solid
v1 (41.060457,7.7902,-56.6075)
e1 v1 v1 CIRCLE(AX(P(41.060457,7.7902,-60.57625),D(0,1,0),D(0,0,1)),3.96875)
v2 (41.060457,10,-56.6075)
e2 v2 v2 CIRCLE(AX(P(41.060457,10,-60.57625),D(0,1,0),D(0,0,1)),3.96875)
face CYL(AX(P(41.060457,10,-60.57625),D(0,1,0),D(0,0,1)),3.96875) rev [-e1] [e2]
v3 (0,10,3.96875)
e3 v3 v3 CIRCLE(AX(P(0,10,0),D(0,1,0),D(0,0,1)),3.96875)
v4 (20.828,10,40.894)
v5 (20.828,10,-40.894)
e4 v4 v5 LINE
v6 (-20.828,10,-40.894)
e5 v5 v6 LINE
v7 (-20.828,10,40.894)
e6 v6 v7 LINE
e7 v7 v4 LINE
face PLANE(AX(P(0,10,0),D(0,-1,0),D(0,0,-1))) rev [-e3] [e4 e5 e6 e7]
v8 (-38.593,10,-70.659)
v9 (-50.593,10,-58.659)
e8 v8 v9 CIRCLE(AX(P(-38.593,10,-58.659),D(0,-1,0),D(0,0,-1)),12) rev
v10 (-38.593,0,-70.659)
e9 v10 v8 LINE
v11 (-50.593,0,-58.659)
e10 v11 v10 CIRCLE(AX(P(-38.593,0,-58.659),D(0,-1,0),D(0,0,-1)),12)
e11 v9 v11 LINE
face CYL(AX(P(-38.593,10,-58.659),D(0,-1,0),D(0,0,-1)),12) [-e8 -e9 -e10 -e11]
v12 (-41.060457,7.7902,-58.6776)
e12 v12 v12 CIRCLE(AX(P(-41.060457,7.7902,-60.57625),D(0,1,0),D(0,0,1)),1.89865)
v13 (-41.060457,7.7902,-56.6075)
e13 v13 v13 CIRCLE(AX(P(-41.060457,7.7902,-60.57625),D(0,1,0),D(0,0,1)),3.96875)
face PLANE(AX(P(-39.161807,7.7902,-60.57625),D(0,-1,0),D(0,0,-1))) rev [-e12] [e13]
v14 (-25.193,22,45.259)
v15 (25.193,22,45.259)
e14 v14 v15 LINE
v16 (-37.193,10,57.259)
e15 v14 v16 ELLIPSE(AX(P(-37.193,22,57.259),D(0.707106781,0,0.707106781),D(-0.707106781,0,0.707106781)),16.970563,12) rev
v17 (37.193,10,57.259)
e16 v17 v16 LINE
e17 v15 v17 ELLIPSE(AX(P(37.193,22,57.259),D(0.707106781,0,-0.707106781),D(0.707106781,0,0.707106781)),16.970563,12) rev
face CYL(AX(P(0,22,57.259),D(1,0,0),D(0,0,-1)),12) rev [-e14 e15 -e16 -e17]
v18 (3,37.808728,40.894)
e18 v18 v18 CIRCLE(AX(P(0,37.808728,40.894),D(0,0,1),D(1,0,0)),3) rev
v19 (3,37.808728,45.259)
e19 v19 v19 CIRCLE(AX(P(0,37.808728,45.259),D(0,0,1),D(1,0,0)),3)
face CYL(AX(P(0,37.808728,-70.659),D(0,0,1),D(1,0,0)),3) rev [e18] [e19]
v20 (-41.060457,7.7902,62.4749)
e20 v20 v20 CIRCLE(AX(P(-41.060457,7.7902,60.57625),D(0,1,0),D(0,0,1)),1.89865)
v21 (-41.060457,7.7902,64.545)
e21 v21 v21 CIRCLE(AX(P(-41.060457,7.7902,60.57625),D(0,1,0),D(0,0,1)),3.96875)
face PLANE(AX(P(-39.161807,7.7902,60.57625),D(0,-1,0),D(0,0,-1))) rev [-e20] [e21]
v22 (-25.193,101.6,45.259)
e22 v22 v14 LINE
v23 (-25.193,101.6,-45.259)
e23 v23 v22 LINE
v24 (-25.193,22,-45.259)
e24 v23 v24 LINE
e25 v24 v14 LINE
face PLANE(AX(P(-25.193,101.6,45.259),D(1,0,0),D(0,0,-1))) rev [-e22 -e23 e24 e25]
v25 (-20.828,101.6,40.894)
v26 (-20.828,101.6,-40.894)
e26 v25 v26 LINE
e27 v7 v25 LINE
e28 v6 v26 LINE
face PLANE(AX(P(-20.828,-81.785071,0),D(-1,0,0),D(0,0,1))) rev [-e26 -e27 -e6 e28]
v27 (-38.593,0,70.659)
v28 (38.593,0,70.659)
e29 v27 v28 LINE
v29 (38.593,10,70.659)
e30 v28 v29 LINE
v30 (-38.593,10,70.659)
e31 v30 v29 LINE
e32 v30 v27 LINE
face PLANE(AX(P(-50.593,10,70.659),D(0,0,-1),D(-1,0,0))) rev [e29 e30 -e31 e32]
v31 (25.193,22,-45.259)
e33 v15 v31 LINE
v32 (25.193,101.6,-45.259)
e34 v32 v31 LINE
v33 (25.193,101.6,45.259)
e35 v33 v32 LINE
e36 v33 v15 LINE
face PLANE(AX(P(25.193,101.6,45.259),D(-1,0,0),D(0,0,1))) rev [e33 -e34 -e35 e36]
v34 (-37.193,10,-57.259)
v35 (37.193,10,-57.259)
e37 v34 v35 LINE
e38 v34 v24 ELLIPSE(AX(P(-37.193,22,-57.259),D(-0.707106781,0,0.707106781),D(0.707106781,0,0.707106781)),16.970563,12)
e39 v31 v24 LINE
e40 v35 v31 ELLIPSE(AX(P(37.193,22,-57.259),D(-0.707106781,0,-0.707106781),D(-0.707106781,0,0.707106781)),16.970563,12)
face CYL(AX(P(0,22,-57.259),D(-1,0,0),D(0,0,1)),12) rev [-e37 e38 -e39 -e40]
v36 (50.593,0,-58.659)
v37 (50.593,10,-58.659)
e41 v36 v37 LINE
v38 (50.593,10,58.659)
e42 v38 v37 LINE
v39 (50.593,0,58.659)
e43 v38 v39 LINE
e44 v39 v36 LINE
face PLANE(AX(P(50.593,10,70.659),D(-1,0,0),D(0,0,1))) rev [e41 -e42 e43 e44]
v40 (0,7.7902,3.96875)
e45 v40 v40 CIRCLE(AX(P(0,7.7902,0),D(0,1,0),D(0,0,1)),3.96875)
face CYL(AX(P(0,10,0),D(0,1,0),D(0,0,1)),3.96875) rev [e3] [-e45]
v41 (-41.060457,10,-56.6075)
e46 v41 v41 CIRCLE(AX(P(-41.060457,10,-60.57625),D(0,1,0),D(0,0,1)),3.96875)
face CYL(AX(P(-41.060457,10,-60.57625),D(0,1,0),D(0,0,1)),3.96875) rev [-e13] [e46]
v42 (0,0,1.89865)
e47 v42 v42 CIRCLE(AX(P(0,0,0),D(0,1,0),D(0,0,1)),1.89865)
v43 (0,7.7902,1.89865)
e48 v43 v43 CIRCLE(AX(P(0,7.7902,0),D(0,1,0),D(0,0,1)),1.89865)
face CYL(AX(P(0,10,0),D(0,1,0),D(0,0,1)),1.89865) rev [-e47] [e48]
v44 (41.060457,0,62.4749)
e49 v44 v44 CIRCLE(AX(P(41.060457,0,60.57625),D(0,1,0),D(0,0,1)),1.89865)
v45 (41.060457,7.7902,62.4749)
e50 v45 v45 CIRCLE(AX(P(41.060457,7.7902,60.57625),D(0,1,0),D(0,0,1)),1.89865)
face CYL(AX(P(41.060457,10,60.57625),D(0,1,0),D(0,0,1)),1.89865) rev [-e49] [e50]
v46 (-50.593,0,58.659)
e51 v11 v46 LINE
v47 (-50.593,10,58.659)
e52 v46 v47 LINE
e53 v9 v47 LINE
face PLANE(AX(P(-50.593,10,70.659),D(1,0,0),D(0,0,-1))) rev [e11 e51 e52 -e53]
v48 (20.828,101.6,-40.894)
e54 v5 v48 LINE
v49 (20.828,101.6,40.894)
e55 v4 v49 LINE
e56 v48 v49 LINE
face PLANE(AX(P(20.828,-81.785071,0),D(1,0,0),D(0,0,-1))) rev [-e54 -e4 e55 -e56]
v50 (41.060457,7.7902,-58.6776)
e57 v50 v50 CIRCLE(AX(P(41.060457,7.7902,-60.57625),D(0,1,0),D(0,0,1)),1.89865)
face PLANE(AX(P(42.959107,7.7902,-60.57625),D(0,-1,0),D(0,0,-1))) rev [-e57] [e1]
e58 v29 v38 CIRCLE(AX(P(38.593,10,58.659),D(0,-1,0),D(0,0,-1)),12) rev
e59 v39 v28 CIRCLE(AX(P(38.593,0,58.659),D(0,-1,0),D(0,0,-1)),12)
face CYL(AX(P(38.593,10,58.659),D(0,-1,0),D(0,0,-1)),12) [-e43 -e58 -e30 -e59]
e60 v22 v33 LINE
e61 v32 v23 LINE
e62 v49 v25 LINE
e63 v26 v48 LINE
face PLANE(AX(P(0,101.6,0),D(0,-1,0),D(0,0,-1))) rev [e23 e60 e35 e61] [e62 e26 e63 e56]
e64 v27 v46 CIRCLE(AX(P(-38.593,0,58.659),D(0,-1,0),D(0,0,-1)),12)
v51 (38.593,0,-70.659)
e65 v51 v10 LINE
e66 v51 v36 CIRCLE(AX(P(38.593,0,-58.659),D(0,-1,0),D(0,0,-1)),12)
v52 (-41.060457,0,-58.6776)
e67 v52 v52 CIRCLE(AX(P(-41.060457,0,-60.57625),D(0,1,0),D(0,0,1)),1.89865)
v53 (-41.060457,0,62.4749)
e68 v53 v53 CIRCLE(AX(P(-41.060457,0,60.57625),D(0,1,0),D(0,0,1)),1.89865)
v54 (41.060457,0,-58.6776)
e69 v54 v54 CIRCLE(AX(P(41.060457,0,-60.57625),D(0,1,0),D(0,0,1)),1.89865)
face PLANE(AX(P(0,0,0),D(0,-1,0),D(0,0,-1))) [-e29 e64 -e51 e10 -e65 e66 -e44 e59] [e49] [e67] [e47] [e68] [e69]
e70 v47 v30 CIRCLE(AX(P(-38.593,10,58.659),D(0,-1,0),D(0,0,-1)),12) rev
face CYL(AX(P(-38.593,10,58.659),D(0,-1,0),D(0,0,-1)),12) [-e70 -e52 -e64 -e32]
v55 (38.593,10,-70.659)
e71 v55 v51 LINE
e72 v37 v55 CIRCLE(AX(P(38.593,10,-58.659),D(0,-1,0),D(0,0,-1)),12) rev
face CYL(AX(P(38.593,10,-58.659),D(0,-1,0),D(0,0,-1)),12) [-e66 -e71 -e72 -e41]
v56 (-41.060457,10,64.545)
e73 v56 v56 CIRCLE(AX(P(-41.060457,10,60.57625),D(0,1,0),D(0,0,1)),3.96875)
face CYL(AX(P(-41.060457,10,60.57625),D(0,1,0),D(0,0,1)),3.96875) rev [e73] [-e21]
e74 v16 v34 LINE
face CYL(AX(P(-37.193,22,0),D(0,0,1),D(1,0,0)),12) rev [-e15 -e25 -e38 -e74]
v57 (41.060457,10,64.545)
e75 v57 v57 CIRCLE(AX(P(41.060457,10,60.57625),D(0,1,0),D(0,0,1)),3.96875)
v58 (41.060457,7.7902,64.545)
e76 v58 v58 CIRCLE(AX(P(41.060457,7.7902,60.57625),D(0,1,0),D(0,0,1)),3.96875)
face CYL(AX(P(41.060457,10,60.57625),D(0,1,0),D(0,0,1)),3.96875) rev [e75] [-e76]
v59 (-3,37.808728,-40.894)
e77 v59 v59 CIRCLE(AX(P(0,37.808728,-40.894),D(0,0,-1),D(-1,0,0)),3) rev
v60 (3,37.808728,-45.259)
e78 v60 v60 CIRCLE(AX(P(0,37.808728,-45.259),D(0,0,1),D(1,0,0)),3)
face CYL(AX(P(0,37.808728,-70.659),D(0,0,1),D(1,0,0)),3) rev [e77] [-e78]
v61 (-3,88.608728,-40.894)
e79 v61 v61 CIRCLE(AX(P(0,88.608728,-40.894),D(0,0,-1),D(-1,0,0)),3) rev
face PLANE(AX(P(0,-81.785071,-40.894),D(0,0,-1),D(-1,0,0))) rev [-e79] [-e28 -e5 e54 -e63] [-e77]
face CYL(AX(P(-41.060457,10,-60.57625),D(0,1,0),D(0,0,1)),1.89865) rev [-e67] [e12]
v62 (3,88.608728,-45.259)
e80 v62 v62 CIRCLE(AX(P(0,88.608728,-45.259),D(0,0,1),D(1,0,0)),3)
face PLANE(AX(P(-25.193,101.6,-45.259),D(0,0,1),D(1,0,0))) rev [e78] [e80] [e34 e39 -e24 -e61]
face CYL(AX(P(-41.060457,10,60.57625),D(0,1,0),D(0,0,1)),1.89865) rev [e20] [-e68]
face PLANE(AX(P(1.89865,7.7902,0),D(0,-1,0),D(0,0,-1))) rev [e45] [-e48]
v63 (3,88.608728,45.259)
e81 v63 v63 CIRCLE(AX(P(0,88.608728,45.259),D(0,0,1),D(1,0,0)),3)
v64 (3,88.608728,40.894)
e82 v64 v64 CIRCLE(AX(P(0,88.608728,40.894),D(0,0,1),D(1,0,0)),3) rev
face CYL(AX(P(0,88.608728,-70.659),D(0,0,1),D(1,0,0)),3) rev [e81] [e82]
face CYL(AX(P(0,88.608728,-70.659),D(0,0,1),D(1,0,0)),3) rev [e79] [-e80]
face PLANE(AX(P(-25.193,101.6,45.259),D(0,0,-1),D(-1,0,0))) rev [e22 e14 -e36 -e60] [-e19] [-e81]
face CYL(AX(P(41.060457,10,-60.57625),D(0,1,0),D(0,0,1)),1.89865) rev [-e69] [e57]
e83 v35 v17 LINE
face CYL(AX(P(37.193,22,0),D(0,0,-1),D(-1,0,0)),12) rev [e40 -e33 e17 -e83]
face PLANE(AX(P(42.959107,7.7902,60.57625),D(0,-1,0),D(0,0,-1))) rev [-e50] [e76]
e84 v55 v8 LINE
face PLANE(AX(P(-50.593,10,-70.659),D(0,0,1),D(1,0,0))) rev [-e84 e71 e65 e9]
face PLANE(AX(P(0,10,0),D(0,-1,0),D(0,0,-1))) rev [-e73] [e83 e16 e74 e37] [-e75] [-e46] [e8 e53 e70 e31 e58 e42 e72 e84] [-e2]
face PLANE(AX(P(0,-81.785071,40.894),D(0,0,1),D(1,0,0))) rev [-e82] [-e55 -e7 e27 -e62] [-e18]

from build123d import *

# Parameters (mm, degrees)
SKETCH1_W                                     = 50.386
SKETCH1_H                                     = 90.518
SKETCH1_W_2                                   = 40.386
SKETCH1_H_2                                   = 80.518
BOSS_EXTRUDE1_DEPTH                           = 101.6
SKETCH2_W                                     = 101.186
SKETCH2_H                                     = 141.318
BOSS_EXTRUDE2_DEPTH                           = 10
FILLET1_R                                     = 12
CBORE_FOR_6_BINDING_HEAD_MACHINE_SC_2_R       = 1.89865
CBORE_FOR_6_BINDING_HEAD_MACHINE_SCREW2_DEPTH = 10
CBORE_START                                   = 7.7902
CBORE_FOR_6_BINDING_HEAD_MACHINE_SC_3_O_R     = 3.96875
CBORE_FOR_6_BINDING_HEAD_MACHINE_SC_3_O_R_2   = 1.89865
CBORE_FOR_6_BINDING_HEAD_MACHINE_SC_3_DEPTH   = 2.2098
FILLET2_R                                     = 12
SKETCH9_R                                     = 3
CUT_EXTRUDE1_DEPTH                            = 163.231915396
CUT_EXTRUDE2_REACH                            = 135.697
SKETCH10_W                                    = 41.656
SKETCH10_H                                    = 81.788
SKETCH10_W_2                                  = 40.386
SKETCH10_H_2                                  = 80.518
CUT_EXTRUDE2_DIRECTION_2_DEPTH                = 134.697067769


# Read off the part's stored shape, not the designer's step: CBORE for #6 Binding Head Machine Screw2
with BuildPart() as part:
    # Sketch1 → Boss-Extrude1 (new body)
    with BuildSketch(Plane(origin=(0, 0, 0), x_dir=(1, 0, 0), z_dir=(0, 1, 0))):
        Rectangle(SKETCH1_W, SKETCH1_H)
        Rectangle(SKETCH1_W_2, SKETCH1_H_2, mode=Mode.SUBTRACT)
    extrude(amount=BOSS_EXTRUDE1_DEPTH)

    # Sketch2 → Boss-Extrude2 (add)
    with BuildSketch(Plane(origin=(0, 0, 0), x_dir=(1, 0, 0), z_dir=(0, 1, 0))):
        Rectangle(SKETCH2_W, SKETCH2_H)
    extrude(amount=BOSS_EXTRUDE2_DEPTH)

    # Fillet1
    fillet1_edges = [part.edges().sort_by_distance(p)[0] for p in [
        (0, 10, -45.259),
        (25.193, 10, 0),
        (0, 10, 45.259),
        (-25.193, 10, 0),
    ]]
    fillet(fillet1_edges, radius=FILLET1_R)

    # CBORE for _6 Binding Head Machine Sc 2 → CBORE for #6 Binding Head Machine Screw2 (cut)
    with BuildSketch(Plane(origin=(0, 0, 0), x_dir=(1, 0, 0), z_dir=(0, 1, 0))):
        with Locations((41.060456563, -60.576250035)):
            Circle(CBORE_FOR_6_BINDING_HEAD_MACHINE_SC_2_R)
        with Locations((-41.060456563, 60.576250035)):
            Circle(CBORE_FOR_6_BINDING_HEAD_MACHINE_SC_2_R)
        with Locations((-41.060456563, -60.576250035)):
            Circle(CBORE_FOR_6_BINDING_HEAD_MACHINE_SC_2_R)
        with Locations((41.060456563, 60.576250035)):
            Circle(CBORE_FOR_6_BINDING_HEAD_MACHINE_SC_2_R)
        Circle(CBORE_FOR_6_BINDING_HEAD_MACHINE_SC_2_R)
    extrude(amount=CBORE_FOR_6_BINDING_HEAD_MACHINE_SCREW2_DEPTH, mode=Mode.SUBTRACT)

    # CBORE for _6 Binding Head Machine Sc 3 o → CBORE for _6 Binding Head Machine Sc 3 (cut)
    # profile 1 of 5: a face of its own
    with BuildSketch(Plane(origin=(0, 0, 0), x_dir=(1, 0, 0), z_dir=(0, 1, 0)).offset(CBORE_START)):
        with Locations((41.060456563, -60.576250035)):
            Circle(CBORE_FOR_6_BINDING_HEAD_MACHINE_SC_3_O_R)
        with Locations((41.060456563, -60.576250035)):
            Circle(CBORE_FOR_6_BINDING_HEAD_MACHINE_SC_3_O_R_2, mode=Mode.SUBTRACT)
    # profile 2 of 5: a face of its own
    with BuildSketch(Plane(origin=(0, 0, 0), x_dir=(1, 0, 0), z_dir=(0, 1, 0)).offset(CBORE_START)):
        with Locations((-41.060456563, 60.576250035)):
            Circle(CBORE_FOR_6_BINDING_HEAD_MACHINE_SC_3_O_R)
        with Locations((-41.060456563, 60.576250035)):
            Circle(CBORE_FOR_6_BINDING_HEAD_MACHINE_SC_3_O_R_2, mode=Mode.SUBTRACT)
    # profile 3 of 5: a face of its own
    with BuildSketch(Plane(origin=(0, 0, 0), x_dir=(1, 0, 0), z_dir=(0, 1, 0)).offset(CBORE_START)):
        with Locations((-41.060456563, -60.576250035)):
            Circle(CBORE_FOR_6_BINDING_HEAD_MACHINE_SC_3_O_R)
        with Locations((-41.060456563, -60.576250035)):
            Circle(CBORE_FOR_6_BINDING_HEAD_MACHINE_SC_3_O_R_2, mode=Mode.SUBTRACT)
    # profile 4 of 5: a face of its own
    with BuildSketch(Plane(origin=(0, 0, 0), x_dir=(1, 0, 0), z_dir=(0, 1, 0)).offset(CBORE_START)):
        with Locations((41.060456563, 60.576250035)):
            Circle(CBORE_FOR_6_BINDING_HEAD_MACHINE_SC_3_O_R)
        with Locations((41.060456563, 60.576250035)):
            Circle(CBORE_FOR_6_BINDING_HEAD_MACHINE_SC_3_O_R_2, mode=Mode.SUBTRACT)
    # profile 5 of 5: a face of its own
    with BuildSketch(Plane(origin=(0, 0, 0), x_dir=(1, 0, 0), z_dir=(0, 1, 0)).offset(CBORE_START)):
        Circle(CBORE_FOR_6_BINDING_HEAD_MACHINE_SC_3_O_R)
        Circle(CBORE_FOR_6_BINDING_HEAD_MACHINE_SC_3_O_R_2, mode=Mode.SUBTRACT)
    extrude(amount=CBORE_FOR_6_BINDING_HEAD_MACHINE_SC_3_DEPTH, mode=Mode.SUBTRACT)

    # Fillet2
    fillet2_edges = [part.edges().sort_by_distance(p)[0] for p in [
        (50.593, 5, 70.659),
        (50.593, 5, -70.659),
        (-50.593, 5, -70.659),
        (-50.593, 5, 70.659),
    ]]
    fillet(fillet2_edges, radius=FILLET2_R)

    # Sketch9 → Cut-Extrude1 (cut, through all)
    with BuildSketch(Plane.XY.offset(45.259)):
        with Locations((0, 88.608727906)):
            Circle(SKETCH9_R)
        with Locations((0, 37.808727906)):
            Circle(SKETCH9_R)
    extrude(amount=-CUT_EXTRUDE1_DEPTH, mode=Mode.SUBTRACT)

    # Cut-Extrude2: up to this face of the body (flat: up to its plane)
    cut_extrude2_end = Plane(part.part.faces().sort_by_distance((0, 10, -39.358212715))[0])
    # Sketch10 → Cut-Extrude2 (cut, up to the picked face)
    with BuildSketch(Plane(origin=(0, 101.6, 0), x_dir=(1, 0, 0), z_dir=(0, 1, 0)), mode=Mode.PRIVATE) as cut_extrude2_sk1:
        Rectangle(SKETCH10_W, SKETCH10_H)
        Rectangle(SKETCH10_W_2, SKETCH10_H_2, mode=Mode.SUBTRACT)
    cut_extrude2_tool1 = split(extrude(cut_extrude2_sk1.sketch, amount=-CUT_EXTRUDE2_REACH, mode=Mode.PRIVATE), bisect_by=cut_extrude2_end, keep=Keep.BOTH, mode=Mode.PRIVATE)
    add(cut_extrude2_tool1.solids().sort_by(Axis((20.736215, 101.6, 0), (0, -1, 0)))[0], mode=Mode.SUBTRACT)

    # Sketch10 → Cut-Extrude2 direction 2 (cut)
    with BuildSketch(Plane(origin=(0, 101.6, 0), x_dir=(1, 0, 0), z_dir=(0, 1, 0))):
        Rectangle(SKETCH10_W, SKETCH10_H)
        Rectangle(SKETCH10_W_2, SKETCH10_H_2, mode=Mode.SUBTRACT)
    extrude(amount=CUT_EXTRUDE2_DIRECTION_2_DEPTH, mode=Mode.SUBTRACT)


solid = part.part
